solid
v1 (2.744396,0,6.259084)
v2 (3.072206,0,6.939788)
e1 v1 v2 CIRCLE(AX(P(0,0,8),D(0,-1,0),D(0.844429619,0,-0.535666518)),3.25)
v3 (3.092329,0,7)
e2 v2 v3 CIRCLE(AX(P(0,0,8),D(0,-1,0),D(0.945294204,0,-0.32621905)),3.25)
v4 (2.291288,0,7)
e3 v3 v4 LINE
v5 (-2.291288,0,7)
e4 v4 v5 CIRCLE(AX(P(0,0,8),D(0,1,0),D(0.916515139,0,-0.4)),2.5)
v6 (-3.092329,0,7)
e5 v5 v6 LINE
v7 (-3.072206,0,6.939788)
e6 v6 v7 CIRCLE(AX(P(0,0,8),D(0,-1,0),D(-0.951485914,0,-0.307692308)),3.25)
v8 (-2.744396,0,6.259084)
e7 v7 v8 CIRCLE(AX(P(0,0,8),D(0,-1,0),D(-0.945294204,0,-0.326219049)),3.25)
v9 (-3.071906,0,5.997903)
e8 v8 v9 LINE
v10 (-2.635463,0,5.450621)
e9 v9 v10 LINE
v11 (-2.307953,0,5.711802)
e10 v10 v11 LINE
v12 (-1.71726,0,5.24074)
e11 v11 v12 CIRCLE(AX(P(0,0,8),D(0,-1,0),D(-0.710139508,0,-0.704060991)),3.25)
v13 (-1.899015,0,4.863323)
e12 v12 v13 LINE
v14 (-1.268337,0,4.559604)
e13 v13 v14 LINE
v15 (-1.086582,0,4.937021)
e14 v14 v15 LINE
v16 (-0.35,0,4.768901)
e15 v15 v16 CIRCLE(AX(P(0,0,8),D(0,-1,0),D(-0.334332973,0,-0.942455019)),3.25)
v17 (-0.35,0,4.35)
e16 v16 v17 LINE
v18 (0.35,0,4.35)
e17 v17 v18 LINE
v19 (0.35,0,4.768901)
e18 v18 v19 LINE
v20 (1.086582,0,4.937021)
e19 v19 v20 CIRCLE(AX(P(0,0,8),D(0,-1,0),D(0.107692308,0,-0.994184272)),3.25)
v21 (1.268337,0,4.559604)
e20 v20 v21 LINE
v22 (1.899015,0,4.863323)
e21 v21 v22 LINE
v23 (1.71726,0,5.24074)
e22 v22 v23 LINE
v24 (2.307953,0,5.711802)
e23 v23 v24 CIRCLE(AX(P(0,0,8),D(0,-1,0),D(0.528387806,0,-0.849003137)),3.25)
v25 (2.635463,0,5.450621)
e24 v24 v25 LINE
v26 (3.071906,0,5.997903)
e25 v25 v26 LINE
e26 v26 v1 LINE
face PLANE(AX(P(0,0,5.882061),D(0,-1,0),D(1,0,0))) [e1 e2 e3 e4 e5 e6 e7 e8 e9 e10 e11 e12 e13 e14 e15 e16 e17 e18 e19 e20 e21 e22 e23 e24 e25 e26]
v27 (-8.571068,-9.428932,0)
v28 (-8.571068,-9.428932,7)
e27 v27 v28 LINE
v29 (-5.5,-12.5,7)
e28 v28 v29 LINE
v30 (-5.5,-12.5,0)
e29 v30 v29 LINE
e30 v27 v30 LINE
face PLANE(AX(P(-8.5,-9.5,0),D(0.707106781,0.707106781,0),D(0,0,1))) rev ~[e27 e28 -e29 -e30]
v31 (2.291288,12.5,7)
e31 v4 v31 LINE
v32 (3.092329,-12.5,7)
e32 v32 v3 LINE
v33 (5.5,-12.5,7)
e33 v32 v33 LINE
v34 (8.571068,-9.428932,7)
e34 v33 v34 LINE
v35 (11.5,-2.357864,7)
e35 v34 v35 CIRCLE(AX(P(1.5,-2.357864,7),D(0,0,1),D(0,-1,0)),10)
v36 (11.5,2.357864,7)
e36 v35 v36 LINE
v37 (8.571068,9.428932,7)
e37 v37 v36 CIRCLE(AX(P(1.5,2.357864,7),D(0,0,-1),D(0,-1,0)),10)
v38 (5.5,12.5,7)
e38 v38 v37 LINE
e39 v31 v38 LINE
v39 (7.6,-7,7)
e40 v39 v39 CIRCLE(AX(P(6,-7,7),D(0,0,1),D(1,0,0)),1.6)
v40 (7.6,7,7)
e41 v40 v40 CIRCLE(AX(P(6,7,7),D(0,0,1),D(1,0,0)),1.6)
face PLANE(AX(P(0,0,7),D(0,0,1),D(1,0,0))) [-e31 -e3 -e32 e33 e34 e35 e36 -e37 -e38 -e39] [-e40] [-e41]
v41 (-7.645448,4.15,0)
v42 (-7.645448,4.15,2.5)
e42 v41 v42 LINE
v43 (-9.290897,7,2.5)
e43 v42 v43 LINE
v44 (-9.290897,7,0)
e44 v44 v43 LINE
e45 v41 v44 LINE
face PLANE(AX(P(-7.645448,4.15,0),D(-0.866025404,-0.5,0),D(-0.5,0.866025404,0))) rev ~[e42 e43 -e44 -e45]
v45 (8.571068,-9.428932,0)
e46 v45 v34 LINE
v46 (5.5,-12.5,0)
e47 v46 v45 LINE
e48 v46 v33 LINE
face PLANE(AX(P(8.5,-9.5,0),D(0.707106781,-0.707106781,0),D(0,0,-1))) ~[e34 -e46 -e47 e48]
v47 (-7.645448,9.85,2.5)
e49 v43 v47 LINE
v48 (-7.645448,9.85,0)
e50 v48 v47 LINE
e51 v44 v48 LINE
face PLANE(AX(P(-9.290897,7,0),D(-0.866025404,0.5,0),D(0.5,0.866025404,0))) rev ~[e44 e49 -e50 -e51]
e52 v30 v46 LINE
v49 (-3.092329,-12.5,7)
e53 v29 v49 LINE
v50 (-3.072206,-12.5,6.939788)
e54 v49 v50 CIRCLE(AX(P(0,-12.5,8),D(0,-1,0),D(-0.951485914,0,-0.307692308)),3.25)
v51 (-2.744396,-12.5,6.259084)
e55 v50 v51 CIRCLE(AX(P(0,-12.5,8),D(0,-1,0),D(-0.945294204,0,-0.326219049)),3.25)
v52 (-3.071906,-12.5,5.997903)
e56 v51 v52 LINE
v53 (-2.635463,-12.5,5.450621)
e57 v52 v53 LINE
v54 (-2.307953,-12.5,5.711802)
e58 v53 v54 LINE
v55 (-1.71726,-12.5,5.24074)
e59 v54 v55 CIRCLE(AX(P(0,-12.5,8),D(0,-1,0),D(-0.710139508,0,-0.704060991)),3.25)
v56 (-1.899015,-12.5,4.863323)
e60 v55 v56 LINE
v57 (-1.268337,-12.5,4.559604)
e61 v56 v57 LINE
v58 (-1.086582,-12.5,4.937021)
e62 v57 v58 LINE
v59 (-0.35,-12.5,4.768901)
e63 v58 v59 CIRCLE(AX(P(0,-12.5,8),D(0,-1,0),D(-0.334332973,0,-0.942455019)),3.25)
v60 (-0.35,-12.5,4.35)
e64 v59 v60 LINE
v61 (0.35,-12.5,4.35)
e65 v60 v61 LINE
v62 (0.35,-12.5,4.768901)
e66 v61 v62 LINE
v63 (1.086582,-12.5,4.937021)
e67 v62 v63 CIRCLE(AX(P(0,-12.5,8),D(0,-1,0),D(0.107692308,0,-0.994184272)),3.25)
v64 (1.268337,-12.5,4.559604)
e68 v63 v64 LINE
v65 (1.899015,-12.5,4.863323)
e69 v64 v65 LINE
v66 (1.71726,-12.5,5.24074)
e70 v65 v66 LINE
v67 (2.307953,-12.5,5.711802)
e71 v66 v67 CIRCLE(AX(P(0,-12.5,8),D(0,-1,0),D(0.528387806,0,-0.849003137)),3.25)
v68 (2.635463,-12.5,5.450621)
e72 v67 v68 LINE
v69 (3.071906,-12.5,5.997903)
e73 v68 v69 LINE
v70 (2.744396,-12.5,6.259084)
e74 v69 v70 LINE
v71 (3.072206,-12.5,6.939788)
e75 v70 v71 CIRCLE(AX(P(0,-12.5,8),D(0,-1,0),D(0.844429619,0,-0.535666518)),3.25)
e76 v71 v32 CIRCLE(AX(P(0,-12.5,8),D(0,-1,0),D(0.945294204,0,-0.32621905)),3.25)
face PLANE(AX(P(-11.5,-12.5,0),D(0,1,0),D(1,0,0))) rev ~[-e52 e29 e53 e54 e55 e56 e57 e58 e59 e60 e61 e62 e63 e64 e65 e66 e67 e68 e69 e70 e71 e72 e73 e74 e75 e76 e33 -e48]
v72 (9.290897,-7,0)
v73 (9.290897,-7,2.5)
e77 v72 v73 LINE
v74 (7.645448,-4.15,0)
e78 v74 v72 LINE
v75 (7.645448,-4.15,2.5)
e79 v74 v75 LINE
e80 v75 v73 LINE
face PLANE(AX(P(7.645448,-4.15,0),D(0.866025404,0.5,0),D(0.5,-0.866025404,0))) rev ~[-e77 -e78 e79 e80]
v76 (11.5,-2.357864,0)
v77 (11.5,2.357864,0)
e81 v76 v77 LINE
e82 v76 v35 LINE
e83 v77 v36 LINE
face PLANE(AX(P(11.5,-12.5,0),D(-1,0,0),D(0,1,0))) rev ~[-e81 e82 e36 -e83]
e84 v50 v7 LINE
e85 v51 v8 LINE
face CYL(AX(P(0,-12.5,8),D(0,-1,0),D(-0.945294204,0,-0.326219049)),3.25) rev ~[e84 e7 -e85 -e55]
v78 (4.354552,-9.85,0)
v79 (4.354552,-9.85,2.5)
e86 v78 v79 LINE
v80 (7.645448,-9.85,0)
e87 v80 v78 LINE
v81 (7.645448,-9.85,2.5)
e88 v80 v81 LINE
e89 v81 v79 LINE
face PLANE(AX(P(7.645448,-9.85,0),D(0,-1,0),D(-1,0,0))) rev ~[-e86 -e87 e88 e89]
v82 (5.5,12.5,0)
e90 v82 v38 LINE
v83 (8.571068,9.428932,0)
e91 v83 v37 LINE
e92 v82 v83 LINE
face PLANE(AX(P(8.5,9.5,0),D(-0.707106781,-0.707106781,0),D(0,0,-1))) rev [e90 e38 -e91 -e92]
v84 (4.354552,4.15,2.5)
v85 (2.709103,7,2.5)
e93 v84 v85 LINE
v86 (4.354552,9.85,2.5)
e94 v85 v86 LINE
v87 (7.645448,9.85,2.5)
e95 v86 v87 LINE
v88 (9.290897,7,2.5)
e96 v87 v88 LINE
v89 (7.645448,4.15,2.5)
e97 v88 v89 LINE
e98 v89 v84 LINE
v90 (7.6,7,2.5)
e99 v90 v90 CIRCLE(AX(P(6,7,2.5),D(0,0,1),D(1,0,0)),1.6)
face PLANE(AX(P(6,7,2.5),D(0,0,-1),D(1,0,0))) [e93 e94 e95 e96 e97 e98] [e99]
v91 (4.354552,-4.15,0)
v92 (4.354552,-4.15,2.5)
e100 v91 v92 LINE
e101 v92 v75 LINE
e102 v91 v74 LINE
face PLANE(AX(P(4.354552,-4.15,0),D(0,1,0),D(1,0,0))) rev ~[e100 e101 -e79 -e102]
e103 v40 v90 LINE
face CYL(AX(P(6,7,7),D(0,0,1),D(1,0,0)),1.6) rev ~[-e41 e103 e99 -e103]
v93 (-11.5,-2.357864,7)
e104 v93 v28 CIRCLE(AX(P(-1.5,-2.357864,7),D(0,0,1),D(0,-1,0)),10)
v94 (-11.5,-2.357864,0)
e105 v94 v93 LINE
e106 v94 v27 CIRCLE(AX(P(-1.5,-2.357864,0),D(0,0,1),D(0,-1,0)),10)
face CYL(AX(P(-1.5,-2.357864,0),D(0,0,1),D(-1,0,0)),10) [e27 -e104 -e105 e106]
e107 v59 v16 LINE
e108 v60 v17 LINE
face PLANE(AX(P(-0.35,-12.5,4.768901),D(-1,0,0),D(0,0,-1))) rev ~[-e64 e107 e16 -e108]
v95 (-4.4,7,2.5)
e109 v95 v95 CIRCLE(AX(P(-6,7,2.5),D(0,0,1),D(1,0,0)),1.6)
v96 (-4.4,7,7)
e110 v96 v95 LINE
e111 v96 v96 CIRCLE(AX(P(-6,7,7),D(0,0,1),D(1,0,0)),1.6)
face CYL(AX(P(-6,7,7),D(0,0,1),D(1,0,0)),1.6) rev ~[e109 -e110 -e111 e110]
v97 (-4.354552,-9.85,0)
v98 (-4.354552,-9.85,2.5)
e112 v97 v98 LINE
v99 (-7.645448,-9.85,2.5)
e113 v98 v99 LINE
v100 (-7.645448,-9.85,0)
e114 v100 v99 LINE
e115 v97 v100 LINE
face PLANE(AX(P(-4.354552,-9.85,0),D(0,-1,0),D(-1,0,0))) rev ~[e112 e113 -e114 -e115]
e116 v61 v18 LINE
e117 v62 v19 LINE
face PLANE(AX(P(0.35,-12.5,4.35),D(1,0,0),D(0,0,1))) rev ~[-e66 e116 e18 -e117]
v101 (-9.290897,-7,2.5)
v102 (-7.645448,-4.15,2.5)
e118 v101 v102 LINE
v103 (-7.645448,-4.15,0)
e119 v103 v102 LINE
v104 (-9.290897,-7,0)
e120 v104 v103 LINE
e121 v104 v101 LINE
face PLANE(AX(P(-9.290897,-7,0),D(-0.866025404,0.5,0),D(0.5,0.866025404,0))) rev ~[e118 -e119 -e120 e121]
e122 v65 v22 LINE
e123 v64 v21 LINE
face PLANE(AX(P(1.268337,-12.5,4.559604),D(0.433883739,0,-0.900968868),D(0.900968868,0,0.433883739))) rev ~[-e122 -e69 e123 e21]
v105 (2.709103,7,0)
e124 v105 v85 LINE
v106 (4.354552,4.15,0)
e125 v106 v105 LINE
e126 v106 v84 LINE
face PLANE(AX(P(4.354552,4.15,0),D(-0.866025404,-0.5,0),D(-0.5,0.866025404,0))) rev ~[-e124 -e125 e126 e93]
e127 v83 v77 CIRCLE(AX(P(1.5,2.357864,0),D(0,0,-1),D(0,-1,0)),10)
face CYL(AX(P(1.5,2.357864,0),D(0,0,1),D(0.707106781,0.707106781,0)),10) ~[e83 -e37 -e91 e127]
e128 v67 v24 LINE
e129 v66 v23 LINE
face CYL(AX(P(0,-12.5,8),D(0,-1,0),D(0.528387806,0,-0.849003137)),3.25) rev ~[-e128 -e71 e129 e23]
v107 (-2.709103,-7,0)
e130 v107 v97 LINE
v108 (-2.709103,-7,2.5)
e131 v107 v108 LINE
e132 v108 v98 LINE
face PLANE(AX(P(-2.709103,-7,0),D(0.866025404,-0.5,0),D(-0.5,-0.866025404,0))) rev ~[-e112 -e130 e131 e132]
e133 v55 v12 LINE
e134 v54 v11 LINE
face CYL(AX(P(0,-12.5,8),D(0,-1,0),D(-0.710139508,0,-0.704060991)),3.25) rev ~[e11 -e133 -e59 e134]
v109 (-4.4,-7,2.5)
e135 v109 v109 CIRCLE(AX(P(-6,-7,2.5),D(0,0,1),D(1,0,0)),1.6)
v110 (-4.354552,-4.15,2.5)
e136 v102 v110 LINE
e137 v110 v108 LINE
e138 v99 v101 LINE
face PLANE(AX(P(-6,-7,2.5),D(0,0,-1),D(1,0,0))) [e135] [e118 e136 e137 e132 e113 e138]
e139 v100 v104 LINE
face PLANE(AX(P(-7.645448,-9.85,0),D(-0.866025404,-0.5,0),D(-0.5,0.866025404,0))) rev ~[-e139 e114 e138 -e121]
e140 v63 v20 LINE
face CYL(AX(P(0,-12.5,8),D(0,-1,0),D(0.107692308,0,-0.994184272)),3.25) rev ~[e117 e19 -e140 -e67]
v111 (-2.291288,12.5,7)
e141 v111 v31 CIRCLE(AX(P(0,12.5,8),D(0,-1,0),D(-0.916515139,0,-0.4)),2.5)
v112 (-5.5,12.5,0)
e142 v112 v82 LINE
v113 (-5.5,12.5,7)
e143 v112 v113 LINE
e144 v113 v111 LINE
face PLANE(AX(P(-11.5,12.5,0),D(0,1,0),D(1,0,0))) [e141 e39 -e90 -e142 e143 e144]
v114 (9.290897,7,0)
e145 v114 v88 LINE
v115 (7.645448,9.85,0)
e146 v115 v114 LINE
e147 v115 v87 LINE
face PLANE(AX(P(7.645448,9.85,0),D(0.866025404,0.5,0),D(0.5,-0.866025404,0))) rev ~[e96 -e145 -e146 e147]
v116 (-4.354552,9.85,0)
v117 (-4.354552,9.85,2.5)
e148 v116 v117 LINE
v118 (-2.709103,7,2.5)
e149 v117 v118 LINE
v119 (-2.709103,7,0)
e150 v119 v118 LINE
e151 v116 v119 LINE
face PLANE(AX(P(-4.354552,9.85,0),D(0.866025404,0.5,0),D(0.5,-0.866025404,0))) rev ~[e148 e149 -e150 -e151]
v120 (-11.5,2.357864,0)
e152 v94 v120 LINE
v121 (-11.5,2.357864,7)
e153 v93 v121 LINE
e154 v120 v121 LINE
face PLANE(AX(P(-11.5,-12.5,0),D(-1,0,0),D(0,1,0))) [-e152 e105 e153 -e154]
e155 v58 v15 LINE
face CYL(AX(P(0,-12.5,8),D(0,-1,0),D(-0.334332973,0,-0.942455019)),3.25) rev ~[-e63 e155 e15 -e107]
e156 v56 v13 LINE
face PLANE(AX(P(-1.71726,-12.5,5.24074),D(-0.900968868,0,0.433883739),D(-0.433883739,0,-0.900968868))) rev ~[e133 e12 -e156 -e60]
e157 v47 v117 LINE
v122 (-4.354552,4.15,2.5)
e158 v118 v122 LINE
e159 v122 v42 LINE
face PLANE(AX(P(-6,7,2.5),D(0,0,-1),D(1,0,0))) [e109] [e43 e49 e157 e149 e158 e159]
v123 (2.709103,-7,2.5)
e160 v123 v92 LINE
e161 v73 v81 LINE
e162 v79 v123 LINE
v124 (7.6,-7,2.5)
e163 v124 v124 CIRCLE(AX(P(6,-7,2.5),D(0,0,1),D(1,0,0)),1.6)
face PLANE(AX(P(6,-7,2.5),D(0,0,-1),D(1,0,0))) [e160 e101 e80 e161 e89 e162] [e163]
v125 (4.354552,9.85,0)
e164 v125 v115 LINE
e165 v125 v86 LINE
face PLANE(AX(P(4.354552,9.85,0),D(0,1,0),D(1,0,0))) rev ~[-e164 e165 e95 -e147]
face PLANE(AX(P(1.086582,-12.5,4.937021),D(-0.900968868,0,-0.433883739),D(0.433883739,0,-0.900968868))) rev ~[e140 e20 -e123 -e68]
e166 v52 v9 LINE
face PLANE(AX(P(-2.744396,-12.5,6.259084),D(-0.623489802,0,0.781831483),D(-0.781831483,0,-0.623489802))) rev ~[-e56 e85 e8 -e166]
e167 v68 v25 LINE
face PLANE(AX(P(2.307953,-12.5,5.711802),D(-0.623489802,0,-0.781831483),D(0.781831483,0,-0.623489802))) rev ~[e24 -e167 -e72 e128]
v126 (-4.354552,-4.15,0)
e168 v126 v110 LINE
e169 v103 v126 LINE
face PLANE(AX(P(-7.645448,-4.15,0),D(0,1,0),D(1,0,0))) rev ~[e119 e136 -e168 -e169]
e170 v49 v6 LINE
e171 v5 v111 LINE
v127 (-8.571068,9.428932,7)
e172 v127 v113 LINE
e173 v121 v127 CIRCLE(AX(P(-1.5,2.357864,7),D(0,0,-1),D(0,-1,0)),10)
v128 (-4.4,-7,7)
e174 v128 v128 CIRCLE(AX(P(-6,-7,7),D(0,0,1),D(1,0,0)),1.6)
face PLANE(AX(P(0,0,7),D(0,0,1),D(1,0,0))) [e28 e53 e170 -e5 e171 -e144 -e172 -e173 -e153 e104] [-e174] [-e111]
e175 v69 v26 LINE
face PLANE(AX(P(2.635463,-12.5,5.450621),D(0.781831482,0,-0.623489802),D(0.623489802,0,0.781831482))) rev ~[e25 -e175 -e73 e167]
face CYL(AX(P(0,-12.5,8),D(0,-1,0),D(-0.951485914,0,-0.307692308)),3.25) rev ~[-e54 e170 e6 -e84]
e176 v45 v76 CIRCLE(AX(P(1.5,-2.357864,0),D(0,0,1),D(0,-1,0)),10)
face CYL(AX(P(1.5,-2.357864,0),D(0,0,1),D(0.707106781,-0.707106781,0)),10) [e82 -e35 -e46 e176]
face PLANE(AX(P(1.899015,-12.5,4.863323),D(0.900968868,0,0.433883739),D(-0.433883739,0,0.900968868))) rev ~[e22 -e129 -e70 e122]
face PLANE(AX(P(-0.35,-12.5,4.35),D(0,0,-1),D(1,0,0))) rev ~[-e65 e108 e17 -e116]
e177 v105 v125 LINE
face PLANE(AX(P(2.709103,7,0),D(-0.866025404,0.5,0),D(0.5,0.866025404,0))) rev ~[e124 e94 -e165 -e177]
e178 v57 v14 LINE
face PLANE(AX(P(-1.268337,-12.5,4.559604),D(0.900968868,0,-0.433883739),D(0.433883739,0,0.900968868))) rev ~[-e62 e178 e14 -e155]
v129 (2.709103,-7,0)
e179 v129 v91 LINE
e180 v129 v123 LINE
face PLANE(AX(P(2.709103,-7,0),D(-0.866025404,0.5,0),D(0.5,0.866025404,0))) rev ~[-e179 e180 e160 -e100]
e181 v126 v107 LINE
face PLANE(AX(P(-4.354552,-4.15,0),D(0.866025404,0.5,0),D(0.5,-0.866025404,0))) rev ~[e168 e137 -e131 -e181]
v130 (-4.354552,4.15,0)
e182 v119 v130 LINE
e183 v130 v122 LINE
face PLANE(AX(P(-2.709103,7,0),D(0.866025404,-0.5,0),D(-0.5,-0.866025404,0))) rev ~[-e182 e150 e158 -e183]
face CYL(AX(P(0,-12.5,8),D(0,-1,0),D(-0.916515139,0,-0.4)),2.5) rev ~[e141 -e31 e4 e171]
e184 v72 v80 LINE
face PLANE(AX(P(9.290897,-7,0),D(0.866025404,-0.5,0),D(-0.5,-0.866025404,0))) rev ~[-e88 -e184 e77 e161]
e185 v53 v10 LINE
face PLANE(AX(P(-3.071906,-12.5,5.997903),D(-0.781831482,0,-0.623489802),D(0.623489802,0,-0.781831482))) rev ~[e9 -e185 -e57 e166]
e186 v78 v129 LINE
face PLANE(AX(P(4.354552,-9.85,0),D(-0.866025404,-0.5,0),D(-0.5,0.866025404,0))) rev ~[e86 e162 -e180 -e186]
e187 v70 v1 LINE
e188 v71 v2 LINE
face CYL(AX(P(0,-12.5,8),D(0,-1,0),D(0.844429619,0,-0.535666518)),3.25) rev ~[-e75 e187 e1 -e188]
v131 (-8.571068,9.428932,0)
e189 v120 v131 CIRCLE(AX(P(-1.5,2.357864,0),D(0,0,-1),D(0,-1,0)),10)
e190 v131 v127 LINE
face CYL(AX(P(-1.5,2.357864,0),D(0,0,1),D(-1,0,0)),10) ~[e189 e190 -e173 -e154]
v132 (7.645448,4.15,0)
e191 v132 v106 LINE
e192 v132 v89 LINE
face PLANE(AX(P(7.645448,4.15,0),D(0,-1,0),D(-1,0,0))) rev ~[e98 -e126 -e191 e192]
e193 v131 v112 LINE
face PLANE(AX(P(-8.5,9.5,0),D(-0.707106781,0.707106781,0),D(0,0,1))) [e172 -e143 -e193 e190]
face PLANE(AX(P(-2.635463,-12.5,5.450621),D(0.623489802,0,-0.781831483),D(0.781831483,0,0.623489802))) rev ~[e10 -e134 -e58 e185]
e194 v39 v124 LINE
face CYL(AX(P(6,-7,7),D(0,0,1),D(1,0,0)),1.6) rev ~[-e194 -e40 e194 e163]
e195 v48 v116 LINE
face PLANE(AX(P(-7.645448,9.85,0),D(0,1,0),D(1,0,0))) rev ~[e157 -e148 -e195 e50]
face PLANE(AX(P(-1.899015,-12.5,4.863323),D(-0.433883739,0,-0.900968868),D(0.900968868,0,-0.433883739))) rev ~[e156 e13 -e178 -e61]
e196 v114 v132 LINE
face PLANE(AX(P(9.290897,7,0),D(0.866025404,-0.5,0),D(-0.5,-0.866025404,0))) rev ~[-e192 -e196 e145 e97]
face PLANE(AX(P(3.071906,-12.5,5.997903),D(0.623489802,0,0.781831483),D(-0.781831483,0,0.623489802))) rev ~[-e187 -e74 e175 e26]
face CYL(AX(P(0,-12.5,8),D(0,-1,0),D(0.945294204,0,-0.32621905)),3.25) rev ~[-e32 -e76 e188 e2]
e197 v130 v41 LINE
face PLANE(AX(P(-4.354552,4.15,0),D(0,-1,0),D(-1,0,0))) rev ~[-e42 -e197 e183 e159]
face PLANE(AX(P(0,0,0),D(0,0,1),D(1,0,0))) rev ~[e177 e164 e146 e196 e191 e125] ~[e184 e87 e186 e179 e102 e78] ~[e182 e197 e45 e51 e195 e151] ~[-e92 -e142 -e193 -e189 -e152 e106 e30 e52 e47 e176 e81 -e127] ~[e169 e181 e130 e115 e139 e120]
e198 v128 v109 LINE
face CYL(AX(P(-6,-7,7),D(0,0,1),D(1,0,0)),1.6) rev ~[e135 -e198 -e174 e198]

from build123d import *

# Parameters (mm, degrees)
F0_W      = 23
F0_H      = 25
F1_DEPTH  = 7
F3_DEPTH  = 25.001
F4_DEPTH  = 12.5
F5_SIZE   = 6
F6_R      = 10
F7_R      = 1.6
F8_DEPTH  = 25
F10_DEPTH = 2.5


with BuildPart() as f1:
    # F0 (on Top) → F1 (new body)
    with BuildSketch(Plane.XY):
        Rectangle(F0_W, F0_H)
    extrude(amount=F1_DEPTH)

    # F2 (on face) → F3 (cut, through all)
    with BuildSketch(Plane.XZ.offset(12.5)):
        with BuildLine():
            Line((0, 7), (-2.2912878475, 7))
            ThreePointArc((-2.2912878475, 7), (0, 5.5), (2.2912878475, 7))
            Line((2.2912878475, 7), (0, 7))
        make_face()
    extrude(amount=-F3_DEPTH, mode=Mode.SUBTRACT)

    # F2 (on face) → F4 (cut)
    with BuildSketch(Plane.XZ.offset(12.5)):
        with BuildLine():
            ThreePointArc((2.2912878475, 7), (0, 5.5), (-2.2912878475, 7))
            Line((-2.2912878475, 7), (-2.8084005449, 7))
            Line((-2.8084005449, 7), (-3.0722061624, 6.9397880893))
            ThreePointArc((-3.0722061624, 6.9397880893), (-2.9281488207, 6.5898778479), (-2.7443962613, 6.2590838157))
            Line((-2.7443962613, 6.2590838157), (-2.4464411557, 6.4966950836))
            Line((-2.4464411557, 6.4966950836), (-2.0099982944, 5.9494130458))
            Line((-2.0099982944, 5.9494130458), (-2.3079534, 5.711801778))
            ThreePointArc((-2.3079534, 5.711801778), (-2.026341856, 5.459047682), (-1.7172603691, 5.2407398048))
            Line((-1.7172603691, 5.2407398048), (-1.5519077603, 5.5840980352))
            Line((-1.5519077603, 5.5840980352), (-0.9212295527, 5.2803794178))
            Line((-0.9212295527, 5.2803794178), (-1.0865821616, 4.9370211875))
            ThreePointArc((-1.0865821616, 4.9370211875), (-0.7231930354, 4.8314842854), (-0.35, 4.7689011157))
            Line((-0.35, 4.7689011157), (-0.35, 5.15))
            Line((-0.35, 5.15), (0.35, 5.15))
            Line((0.35, 5.15), (0.35, 4.7689011157))
            ThreePointArc((0.35, 4.7689011157), (0.7231930354, 4.8314842854), (1.0865821616, 4.9370211875))
            Line((1.0865821616, 4.9370211875), (0.9212295527, 5.2803794178))
            Line((0.9212295527, 5.2803794178), (1.5519077603, 5.5840980352))
            Line((1.5519077603, 5.5840980352), (1.7172603691, 5.2407398048))
            ThreePointArc((1.7172603691, 5.2407398048), (2.026341856, 5.459047682), (2.3079534, 5.711801778))
            Line((2.3079534, 5.711801778), (2.0099982944, 5.9494130458))
            Line((2.0099982944, 5.9494130458), (2.4464411557, 6.4966950836))
            Line((2.4464411557, 6.4966950836), (2.7443962613, 6.2590838157))
            ThreePointArc((2.7443962613, 6.2590838157), (2.9281488207, 6.5898778479), (3.0722061624, 6.9397880893))
            Line((3.0722061624, 6.9397880893), (2.8084005449, 7))
            Line((2.8084005449, 7), (2.2912878475, 7))
        make_face()
        with BuildLine():
            Line((3.0719063417, 5.9979032421), (2.7443962613, 6.2590838157))
            ThreePointArc((2.7443962613, 6.2590838157), (2.540952318, 5.973658144), (2.3079534, 5.711801778))
            Line((2.3079534, 5.711801778), (2.6354634804, 5.4506212044))
            Line((2.6354634804, 5.4506212044), (3.0719063417, 5.9979032421))
        make_face()
        with BuildLine():
            ThreePointArc((2.3079534, 5.711801778), (2.540952318, 5.973658144), (2.7443962613, 6.2590838157))
            Line((2.7443962613, 6.2590838157), (2.4464411557, 6.4966950836))
            Line((2.4464411557, 6.4966950836), (2.0099982944, 5.9494130458))
            Line((2.0099982944, 5.9494130458), (2.3079534, 5.711801778))
        make_face()
        with BuildLine():
            Line((1.8990147515, 4.8633229408), (1.7172603691, 5.2407398048))
            ThreePointArc((1.7172603691, 5.2407398048), (1.4101221521, 5.0718511793), (1.0865821616, 4.9370211875))
            Line((1.0865821616, 4.9370211875), (1.268336544, 4.5596043235))
            Line((1.268336544, 4.5596043235), (1.8990147515, 4.8633229408))
        make_face()
        with BuildLine():
            ThreePointArc((1.0865821616, 4.9370211875), (1.4101221521, 5.0718511793), (1.7172603691, 5.2407398048))
            Line((1.7172603691, 5.2407398048), (1.5519077603, 5.5840980352))
            Line((1.5519077603, 5.5840980352), (0.9212295527, 5.2803794178))
            Line((0.9212295527, 5.2803794178), (1.0865821616, 4.9370211875))
        make_face()
        with BuildLine():
            ThreePointArc((0.35, 4.7689011157), (0, 4.75), (-0.35, 4.7689011157))
            Line((-0.35, 4.7689011157), (-0.35, 4.35))
            Line((-0.35, 4.35), (0.35, 4.35))
            Line((0.35, 4.35), (0.35, 4.7689011157))
        make_face()
        with BuildLine():
            Line((-0.35, 5.15), (-0.35, 4.7689011157))
            ThreePointArc((-0.35, 4.7689011157), (0, 4.75), (0.35, 4.7689011157))
            Line((0.35, 4.7689011157), (0.35, 5.15))
            Line((0.35, 5.15), (-0.35, 5.15))
        make_face()
        with BuildLine():
            ThreePointArc((-1.0865821616, 4.9370211875), (-1.4101221521, 5.0718511793), (-1.7172603691, 5.2407398048))
            Line((-1.7172603691, 5.2407398048), (-1.8990147515, 4.8633229408))
            Line((-1.8990147515, 4.8633229408), (-1.268336544, 4.5596043235))
            Line((-1.268336544, 4.5596043235), (-1.0865821616, 4.9370211875))
        make_face()
        with BuildLine():
            Line((-1.5519077603, 5.5840980352), (-1.7172603691, 5.2407398048))
            ThreePointArc((-1.7172603691, 5.2407398048), (-1.4101221521, 5.0718511793), (-1.0865821616, 4.9370211875))
            Line((-1.0865821616, 4.9370211875), (-0.9212295527, 5.2803794178))
            Line((-0.9212295527, 5.2803794178), (-1.5519077603, 5.5840980352))
        make_face()
        with BuildLine():
            ThreePointArc((-2.3079534, 5.711801778), (-2.540952318, 5.973658144), (-2.7443962613, 6.2590838157))
            Line((-2.7443962613, 6.2590838157), (-3.0719063417, 5.9979032421))
            Line((-3.0719063417, 5.9979032421), (-2.6354634804, 5.4506212044))
            Line((-2.6354634804, 5.4506212044), (-2.3079534, 5.711801778))
        make_face()
        with BuildLine():
            Line((-2.4464411557, 6.4966950836), (-2.7443962613, 6.2590838157))
            ThreePointArc((-2.7443962613, 6.2590838157), (-2.540952318, 5.973658144), (-2.3079534, 5.711801778))
            Line((-2.3079534, 5.711801778), (-2.0099982944, 5.9494130458))
            Line((-2.0099982944, 5.9494130458), (-2.4464411557, 6.4966950836))
        make_face()
        with BuildLine():
            Line((3.0923292192, 7), (2.8084005449, 7))
            Line((2.8084005449, 7), (3.0722061624, 6.9397880893))
            ThreePointArc((3.0722061624, 6.9397880893), (3.0824147168, 6.969844908), (3.0923292192, 7))
        make_face()
        with BuildLine():
            Line((-3.0722061624, 6.9397880893), (-2.8084005449, 7))
            Line((-2.8084005449, 7), (-3.0923292192, 7))
            ThreePointArc((-3.0923292192, 7), (-3.0824147168, 6.969844908), (-3.0722061624, 6.9397880893))
        make_face()
    extrude(amount=-F4_DEPTH, mode=Mode.SUBTRACT)

    # F5
    f5_edges = [f1.edges().sort_by_distance(p)[0] for p in [
        (11.5, -12.5, 3.5),
        (-11.5, -12.5, 3.5),
        (11.5, 12.5, 3.5),
        (-11.5, 12.5, 3.5),
    ]]
    chamfer(f5_edges, length=F5_SIZE)

    # F6
    f6_edges = [f1.edges().sort_by_distance(p)[0] for p in [
        (11.5, 6.5, 3.5),
        (11.5, -6.5, 3.5),
        (-11.5, 6.5, 3.5),
        (-11.5, -6.5, 3.5),
    ]]
    fillet(f6_edges, radius=F6_R)

    # F7 (on face) → F8 (cut)
    with BuildSketch(Plane.XY.offset(7)):
        with Locations((6, -7)):
            Circle(F7_R)
        with Locations((-6, -7)):
            Circle(F7_R)
        with Locations((-6, 7)):
            Circle(F7_R)
        with Locations((6, 7)):
            Circle(F7_R)
    extrude(amount=-F8_DEPTH, mode=Mode.SUBTRACT)

    # F9 (on face) → F10 (cut)
    with BuildSketch(Plane(origin=(0, 0, 0), x_dir=(1, 0, 0), z_dir=(0, 0, -1))):
        Polygon((-4.3545517328, 4.15), (-2.7091034656, 7), (-4.3545517328, 9.85), (-7.6454482672, 9.85), (-9.2908965344, 7), (-7.6454482672, 4.15), align=None)
        Polygon((-9.2908965344, -7), (-7.6454482672, -9.85), (-4.3545517328, -9.85), (-2.7091034656, -7), (-4.3545517328, -4.15), (-7.6454482672, -4.15), align=None)
        Polygon((2.7091034656, 7), (4.3545517328, 4.15), (7.6454482672, 4.15), (9.2908965344, 7), (7.6454482672, 9.85), (4.3545517328, 9.85), align=None)
        Polygon((2.7091034656, -7), (4.3545517328, -9.85), (7.6454482672, -9.85), (9.2908965344, -7), (7.6454482672, -4.15), (4.3545517328, -4.15), align=None)
    extrude(amount=-F10_DEPTH, mode=Mode.SUBTRACT)


solid = f1.part
